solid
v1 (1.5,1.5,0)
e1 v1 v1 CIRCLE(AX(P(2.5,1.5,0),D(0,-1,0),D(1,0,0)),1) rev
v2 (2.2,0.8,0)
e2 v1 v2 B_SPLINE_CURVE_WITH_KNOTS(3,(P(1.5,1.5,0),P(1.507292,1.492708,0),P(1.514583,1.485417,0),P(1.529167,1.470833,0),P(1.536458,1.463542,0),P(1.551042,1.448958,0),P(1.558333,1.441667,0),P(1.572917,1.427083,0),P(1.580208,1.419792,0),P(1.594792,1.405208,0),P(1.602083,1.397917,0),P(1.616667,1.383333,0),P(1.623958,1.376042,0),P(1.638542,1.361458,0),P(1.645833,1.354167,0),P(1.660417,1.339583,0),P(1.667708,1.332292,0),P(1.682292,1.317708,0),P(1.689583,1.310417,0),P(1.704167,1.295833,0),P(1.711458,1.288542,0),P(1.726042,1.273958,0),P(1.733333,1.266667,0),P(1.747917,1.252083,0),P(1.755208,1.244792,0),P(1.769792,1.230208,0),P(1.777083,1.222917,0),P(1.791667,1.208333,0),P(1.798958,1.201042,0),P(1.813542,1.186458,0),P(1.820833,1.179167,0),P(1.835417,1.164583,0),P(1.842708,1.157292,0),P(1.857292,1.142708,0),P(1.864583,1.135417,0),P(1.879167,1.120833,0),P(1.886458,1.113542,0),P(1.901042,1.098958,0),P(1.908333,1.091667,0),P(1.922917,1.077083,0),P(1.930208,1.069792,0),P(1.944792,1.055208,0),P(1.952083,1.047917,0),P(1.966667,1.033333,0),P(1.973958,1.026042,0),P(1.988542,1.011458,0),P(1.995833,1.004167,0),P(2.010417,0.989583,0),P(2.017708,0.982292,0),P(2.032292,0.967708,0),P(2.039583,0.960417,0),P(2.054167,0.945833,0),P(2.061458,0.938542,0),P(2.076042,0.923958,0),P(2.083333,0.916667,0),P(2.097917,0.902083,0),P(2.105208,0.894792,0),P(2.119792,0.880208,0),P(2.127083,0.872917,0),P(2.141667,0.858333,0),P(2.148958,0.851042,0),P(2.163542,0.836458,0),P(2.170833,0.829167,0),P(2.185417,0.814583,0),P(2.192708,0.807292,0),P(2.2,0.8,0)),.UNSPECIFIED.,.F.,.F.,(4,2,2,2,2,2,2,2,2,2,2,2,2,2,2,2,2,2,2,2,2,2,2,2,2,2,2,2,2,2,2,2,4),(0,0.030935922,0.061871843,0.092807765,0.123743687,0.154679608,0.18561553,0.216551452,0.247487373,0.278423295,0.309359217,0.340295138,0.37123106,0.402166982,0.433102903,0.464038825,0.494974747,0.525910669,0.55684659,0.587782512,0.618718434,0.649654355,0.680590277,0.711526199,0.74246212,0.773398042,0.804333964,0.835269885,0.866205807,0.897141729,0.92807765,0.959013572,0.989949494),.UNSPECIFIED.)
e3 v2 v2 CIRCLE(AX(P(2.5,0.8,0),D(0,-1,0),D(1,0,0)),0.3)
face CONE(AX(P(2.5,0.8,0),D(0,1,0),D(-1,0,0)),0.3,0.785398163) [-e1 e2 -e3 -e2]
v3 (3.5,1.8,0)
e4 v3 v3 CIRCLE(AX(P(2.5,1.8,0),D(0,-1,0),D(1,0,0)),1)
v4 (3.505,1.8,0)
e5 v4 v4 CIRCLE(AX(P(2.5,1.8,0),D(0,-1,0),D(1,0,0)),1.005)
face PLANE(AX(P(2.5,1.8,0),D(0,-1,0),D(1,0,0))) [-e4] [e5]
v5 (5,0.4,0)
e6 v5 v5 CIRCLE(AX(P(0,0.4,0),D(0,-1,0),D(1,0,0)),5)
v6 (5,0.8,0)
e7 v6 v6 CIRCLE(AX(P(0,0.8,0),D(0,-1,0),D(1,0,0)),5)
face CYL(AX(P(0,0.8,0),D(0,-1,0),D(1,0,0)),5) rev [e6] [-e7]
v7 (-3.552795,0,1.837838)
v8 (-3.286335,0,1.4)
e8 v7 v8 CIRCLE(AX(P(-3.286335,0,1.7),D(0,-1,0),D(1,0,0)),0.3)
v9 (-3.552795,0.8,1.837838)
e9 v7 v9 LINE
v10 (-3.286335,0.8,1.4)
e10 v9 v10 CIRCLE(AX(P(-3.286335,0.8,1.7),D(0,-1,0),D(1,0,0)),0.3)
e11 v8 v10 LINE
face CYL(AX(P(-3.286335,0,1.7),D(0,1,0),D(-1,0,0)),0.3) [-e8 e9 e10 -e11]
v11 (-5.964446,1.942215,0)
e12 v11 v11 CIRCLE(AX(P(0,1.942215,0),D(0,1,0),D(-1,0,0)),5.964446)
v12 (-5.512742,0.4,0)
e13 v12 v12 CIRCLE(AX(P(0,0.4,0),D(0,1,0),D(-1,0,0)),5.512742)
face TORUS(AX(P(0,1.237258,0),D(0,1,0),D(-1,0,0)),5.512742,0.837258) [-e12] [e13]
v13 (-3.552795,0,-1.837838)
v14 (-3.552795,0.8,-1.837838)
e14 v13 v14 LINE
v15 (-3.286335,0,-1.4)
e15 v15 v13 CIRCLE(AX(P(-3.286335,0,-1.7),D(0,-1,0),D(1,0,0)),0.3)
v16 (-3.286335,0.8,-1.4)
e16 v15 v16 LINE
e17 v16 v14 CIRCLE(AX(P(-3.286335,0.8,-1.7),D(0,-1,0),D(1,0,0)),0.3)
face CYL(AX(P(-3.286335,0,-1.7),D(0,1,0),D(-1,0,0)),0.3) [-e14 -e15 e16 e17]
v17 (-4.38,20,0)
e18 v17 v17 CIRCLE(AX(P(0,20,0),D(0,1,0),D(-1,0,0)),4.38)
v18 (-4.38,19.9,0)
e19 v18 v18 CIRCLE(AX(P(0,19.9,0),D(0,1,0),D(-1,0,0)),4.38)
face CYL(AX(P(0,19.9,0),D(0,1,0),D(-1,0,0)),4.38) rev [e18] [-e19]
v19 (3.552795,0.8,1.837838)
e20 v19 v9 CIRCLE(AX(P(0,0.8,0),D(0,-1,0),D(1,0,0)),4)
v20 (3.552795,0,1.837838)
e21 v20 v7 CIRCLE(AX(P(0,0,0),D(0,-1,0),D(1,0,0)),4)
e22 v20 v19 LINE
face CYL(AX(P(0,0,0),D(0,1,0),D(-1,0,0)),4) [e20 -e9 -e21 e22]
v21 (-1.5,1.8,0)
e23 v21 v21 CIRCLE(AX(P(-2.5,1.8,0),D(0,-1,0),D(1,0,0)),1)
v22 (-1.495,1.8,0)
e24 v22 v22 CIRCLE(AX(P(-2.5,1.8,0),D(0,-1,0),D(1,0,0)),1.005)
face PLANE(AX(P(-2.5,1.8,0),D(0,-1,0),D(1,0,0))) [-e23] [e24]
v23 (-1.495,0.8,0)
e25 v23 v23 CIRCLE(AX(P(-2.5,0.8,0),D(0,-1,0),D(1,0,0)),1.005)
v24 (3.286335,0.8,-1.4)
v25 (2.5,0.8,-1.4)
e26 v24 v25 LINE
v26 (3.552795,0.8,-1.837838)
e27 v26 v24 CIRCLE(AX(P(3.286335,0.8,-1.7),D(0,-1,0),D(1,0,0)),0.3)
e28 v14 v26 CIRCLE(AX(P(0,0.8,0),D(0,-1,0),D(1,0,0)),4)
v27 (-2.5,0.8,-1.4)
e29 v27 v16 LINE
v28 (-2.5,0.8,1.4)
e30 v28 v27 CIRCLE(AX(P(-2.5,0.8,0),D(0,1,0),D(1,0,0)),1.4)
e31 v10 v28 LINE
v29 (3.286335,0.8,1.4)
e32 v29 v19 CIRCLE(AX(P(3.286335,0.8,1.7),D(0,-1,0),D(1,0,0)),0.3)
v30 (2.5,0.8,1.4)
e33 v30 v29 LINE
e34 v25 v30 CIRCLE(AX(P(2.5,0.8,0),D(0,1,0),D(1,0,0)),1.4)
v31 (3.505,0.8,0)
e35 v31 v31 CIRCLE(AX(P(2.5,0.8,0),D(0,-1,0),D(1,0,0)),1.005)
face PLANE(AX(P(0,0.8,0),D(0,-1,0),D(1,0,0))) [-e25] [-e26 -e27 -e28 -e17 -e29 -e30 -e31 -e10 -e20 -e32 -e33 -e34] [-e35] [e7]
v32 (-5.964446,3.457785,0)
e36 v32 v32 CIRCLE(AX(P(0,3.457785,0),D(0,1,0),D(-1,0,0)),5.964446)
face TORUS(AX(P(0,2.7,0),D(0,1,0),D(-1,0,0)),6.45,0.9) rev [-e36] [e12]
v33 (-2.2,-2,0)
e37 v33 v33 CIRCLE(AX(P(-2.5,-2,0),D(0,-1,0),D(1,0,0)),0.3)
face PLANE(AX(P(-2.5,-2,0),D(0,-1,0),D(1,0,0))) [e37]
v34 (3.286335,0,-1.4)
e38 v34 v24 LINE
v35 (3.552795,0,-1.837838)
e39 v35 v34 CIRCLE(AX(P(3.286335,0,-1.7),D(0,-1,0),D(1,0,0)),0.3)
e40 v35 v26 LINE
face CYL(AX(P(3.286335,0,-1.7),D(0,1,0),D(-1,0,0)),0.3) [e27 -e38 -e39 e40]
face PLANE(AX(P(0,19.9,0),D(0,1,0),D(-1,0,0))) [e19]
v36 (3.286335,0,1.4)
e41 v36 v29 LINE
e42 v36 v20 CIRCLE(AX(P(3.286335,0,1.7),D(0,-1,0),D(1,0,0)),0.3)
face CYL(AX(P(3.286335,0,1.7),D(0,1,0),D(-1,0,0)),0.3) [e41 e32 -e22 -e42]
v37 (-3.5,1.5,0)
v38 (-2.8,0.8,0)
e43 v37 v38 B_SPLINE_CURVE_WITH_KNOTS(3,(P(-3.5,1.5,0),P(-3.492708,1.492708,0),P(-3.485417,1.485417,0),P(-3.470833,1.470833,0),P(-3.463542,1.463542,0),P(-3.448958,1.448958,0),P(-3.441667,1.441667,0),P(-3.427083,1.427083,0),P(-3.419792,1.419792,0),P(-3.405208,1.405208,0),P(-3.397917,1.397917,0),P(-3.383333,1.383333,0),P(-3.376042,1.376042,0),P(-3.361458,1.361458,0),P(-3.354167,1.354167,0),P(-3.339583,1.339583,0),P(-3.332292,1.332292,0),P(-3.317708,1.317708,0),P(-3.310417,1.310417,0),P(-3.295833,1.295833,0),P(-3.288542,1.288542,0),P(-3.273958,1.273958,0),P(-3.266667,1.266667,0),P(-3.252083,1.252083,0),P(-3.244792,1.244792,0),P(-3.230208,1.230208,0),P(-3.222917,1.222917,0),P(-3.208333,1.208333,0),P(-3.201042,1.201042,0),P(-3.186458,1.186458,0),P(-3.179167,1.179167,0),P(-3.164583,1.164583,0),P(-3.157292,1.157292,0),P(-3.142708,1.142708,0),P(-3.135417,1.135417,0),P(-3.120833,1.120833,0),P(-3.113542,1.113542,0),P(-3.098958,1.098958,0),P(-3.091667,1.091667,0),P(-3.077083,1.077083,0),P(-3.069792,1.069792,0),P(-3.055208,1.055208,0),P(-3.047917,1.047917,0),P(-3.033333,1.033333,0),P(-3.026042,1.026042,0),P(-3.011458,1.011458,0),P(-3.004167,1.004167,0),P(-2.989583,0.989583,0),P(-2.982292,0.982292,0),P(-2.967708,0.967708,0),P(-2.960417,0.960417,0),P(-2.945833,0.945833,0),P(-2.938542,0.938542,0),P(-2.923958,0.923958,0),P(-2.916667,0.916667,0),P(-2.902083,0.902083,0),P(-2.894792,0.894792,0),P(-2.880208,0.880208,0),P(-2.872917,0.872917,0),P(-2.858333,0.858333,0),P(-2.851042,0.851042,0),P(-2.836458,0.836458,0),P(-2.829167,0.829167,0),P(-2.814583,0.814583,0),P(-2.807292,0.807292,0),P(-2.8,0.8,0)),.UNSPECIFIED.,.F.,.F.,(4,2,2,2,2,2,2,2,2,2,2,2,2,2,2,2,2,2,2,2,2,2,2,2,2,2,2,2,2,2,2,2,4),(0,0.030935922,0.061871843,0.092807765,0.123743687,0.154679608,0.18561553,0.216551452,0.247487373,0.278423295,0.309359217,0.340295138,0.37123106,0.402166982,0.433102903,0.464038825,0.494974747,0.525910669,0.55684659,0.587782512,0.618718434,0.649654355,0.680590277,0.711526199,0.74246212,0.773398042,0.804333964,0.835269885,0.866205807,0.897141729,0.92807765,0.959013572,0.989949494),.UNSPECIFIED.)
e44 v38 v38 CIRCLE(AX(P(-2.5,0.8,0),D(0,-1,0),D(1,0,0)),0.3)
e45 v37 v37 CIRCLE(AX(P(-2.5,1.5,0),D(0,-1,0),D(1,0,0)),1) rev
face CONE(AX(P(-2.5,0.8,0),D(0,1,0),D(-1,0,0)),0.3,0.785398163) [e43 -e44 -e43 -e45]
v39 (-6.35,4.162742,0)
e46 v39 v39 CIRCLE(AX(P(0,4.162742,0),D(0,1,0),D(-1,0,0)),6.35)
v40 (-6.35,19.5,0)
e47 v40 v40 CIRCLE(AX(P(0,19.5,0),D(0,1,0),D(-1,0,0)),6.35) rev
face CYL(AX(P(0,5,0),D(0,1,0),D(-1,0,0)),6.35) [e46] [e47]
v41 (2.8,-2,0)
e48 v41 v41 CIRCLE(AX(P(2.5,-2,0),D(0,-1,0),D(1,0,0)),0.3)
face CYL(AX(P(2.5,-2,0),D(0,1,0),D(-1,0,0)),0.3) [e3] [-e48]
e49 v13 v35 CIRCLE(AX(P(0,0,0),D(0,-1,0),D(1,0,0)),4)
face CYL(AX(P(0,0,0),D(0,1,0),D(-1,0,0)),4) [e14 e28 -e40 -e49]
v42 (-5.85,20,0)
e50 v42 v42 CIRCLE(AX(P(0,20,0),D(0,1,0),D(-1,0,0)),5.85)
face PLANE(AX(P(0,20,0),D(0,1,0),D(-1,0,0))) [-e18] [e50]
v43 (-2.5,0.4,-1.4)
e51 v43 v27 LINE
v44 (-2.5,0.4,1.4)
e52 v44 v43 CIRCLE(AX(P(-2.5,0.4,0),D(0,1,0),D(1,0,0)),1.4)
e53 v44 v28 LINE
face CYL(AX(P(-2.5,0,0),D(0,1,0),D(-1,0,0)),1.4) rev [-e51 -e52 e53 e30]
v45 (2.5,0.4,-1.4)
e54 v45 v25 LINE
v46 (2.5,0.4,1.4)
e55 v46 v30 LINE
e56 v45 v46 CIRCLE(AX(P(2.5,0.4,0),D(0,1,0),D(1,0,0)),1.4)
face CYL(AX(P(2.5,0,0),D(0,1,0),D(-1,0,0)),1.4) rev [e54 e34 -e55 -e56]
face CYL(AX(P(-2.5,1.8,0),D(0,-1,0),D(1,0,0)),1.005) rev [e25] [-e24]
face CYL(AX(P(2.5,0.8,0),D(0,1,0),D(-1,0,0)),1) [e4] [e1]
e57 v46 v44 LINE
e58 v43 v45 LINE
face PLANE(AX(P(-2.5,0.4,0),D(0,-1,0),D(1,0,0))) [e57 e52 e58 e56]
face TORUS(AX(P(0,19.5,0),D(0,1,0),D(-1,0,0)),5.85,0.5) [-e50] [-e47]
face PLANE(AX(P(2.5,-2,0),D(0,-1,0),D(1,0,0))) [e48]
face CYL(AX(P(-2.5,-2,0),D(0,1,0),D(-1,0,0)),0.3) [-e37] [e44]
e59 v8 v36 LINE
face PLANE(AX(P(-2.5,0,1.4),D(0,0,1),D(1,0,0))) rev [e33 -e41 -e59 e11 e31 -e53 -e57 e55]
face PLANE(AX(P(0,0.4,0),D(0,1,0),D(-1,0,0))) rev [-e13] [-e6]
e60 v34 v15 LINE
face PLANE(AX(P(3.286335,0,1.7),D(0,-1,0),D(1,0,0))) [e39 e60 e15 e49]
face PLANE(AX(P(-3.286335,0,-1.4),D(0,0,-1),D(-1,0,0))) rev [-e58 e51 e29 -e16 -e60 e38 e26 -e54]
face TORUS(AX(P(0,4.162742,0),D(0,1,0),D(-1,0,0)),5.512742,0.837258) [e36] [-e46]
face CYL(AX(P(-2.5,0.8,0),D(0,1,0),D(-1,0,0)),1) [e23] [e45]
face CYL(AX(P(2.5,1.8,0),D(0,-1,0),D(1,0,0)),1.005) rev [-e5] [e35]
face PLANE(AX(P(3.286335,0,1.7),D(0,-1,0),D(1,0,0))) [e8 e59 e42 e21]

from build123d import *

# Parameters (mm, degrees)
SKETCH4_R              = 5
CUT_EXTRUDE1_DEPTH     = 0.4
BOSS_EXTRUDE1_DEPTH    = 0.8
CUT_EXTRUDE2_START     = -0.4
CUT_EXTRUDE2_DEPTH     = 0.4
SKETCH8_R              = 1.005
CUT_EXTRUDE3_DEPTH     = 1
SKETCH9_R              = 1
BOSS_EXTRUDE2_DEPTH    = 1
CHAMFER1_SIZE          = 0.7
SKETCH10_R             = 0.3
BOSS_EXTRUDE3_DEPTH    = 2.8
BOSS_EXTRUDE4_START    = 15
SKETCH11_R             = 6.35
BOSS_EXTRUDE4_DEPTH    = 15
FILLET1_R              = 0.5
SKETCH12_R             = 4.38
CUT_EXTRUDE4_DEPTH     = 0.1
SPLIT1_SURFACE_1_BACK  = 29.4
SPLIT1_SURFACE_1_DEPTH = 58.8
SPLIT1_SURFACE_2_BACK  = 29.4
SPLIT1_SURFACE_2_DEPTH = 58.8


with BuildPart() as part:
    # Sketch3 → Revolve1 (revolve)
    with BuildSketch(Plane.XY, mode=Mode.PRIVATE) as revolve1_sk:
        with BuildLine():
            Line((0, 0.4), (5.5127417, 0.4))
            ThreePointArc((5.5127417, 0.4), (6.316244242, 1.001917854), (5.964446142, 1.942215432))
            ThreePointArc((5.964446142, 1.942215432), (5.55, 2.7), (5.964446142, 3.457784568))
            ThreePointArc((5.964446142, 3.457784568), (6.247314622, 3.760990429), (6.35, 4.1627417))
            Line((6.35, 4.1627417), (6.35, 5))
            Line((6.35, 5), (0, 5))
            Line((0, 5), (0, 0.4))
        make_face()
    revolve(revolve1_sk.sketch.rotate(Axis((0, 5, 0), (0, -1, 0)), 180), axis=Axis((0, 5, 0), (0, -1, 0)))

    # Sketch4 → Cut-Extrude1 (cut)
    with BuildSketch(Plane.XZ.offset(-0.4)):
        Circle(SKETCH4_R)
    extrude(amount=-CUT_EXTRUDE1_DEPTH, mode=Mode.SUBTRACT)

    # Sketch5 → Boss-Extrude1 (add)
    with BuildSketch(Plane.XZ.offset(-0.8)):
        with BuildLine():
            Line((-3.286335345, -1.4), (-2.5, -1.4))
            ThreePointArc((-2.5, -1.4), (-1.1, 0), (-2.5, 1.4))
            Line((-2.5, 1.4), (-3.286335345, 1.4))
            ThreePointArc((-3.286335345, 1.4), (-3.542608004, 1.544037427), (-3.552794968, 1.837837838))
            ThreePointArc((-3.552794968, 1.837837838), (0, 4), (3.552794968, 1.837837838))
            ThreePointArc((3.552794968, 1.837837838), (3.542608004, 1.544037427), (3.286335345, 1.4))
            Line((3.286335345, 1.4), (2.5, 1.4))
            ThreePointArc((2.5, 1.4), (1.1, 0), (2.5, -1.4))
            Line((2.5, -1.4), (3.286335345, -1.4))
            ThreePointArc((3.286335345, -1.4), (3.542608004, -1.544037427), (3.552794968, -1.837837838))
            ThreePointArc((3.552794968, -1.837837838), (0, -4), (-3.552794968, -1.837837838))
            ThreePointArc((-3.552794968, -1.837837838), (-3.542608004, -1.544037427), (-3.286335345, -1.4))
        make_face()
    extrude(amount=BOSS_EXTRUDE1_DEPTH)

    # Sketch7 → Cut-Extrude2 (cut)
    with BuildSketch(Plane.XZ.offset(CUT_EXTRUDE2_START)):
        with BuildLine():
            Line((2.5, 1.4), (-2.5, 1.4))
            ThreePointArc((-2.5, 1.4), (-1.1, 0), (-2.5, -1.4))
            Line((-2.5, -1.4), (2.5, -1.4))
            ThreePointArc((2.5, -1.4), (1.1, 0), (2.5, 1.4))
        make_face()
    extrude(amount=CUT_EXTRUDE2_DEPTH, mode=Mode.SUBTRACT)

    # Sketch8 → Cut-Extrude3 (cut)
    with BuildSketch(Plane.XZ.offset(-0.8)):
        with Locations((-2.5, 0)):
            Circle(SKETCH8_R)
        with Locations((2.5, 0)):
            Circle(SKETCH8_R)
    extrude(amount=-CUT_EXTRUDE3_DEPTH, mode=Mode.SUBTRACT)

    # Sketch9 → Boss-Extrude2 (add)
    with BuildSketch(Plane.XZ.offset(-1.8)):
        with Locations((-2.5, 0)):
            Circle(SKETCH9_R)
        with Locations((2.5, 0)):
            Circle(SKETCH9_R)
    extrude(amount=BOSS_EXTRUDE2_DEPTH)

    # Chamfer1
    chamfer1_edges = [part.edges().sort_by_distance(p)[0] for p in [
        (-3.5, 0.8, 0),
        (1.5, 0.8, 0),
    ]]
    chamfer(chamfer1_edges, length=CHAMFER1_SIZE)

    # Sketch10 → Boss-Extrude3 (add)
    with BuildSketch(Plane.XZ.offset(-0.8)):
        with Locations(Location((-2.5, 0, 0), (0, 0, 180))):
            Circle(SKETCH10_R)
        with Locations(Location((2.5, 0, 0), (0, 0, 180))):
            Circle(SKETCH10_R)
    extrude(amount=BOSS_EXTRUDE3_DEPTH)

    # Sketch11 → Boss-Extrude4 (add)
    with BuildSketch(Plane(origin=(0, 5, 0), x_dir=(1, 0, 0), z_dir=(0, 1, 0)).offset(BOSS_EXTRUDE4_START)):
        with Locations(Location((0, 0, 0), (0, 0, 180))):
            Circle(SKETCH11_R)
    extrude(amount=-BOSS_EXTRUDE4_DEPTH)

    # Fillet1
    fillet1_edges = [part.edges().sort_by_distance(p)[0] for p in [
        (6.35, 20, 0),
    ]]
    fillet(fillet1_edges, radius=FILLET1_R)

    # Sketch12 → Cut-Extrude4 (cut)
    with BuildSketch(Plane(origin=(0, 20, 0), x_dir=(1, 0, 0), z_dir=(0, 1, 0))):
        with Locations(Location((0, 0, 0), (0, 0, 180))):
            Circle(SKETCH12_R)
    extrude(amount=-CUT_EXTRUDE4_DEPTH, mode=Mode.SUBTRACT)


with BuildPart() as body_2:
    # Split1: the piece behind the surface
    add(part.part)
    # Split1 surface: a surface, the sketch's curves swept straight by 58.8 mm
    with BuildLine(Plane(origin=(10, 0, 0), x_dir=(0, 0, -1), z_dir=(1, 0, 0)).offset(-SPLIT1_SURFACE_1_BACK), mode=Mode.PRIVATE) as split1_surface_1_path:
        Line((-1.9, 0), (1.9, 0))
        Line((1.9, 0), (1.9, 20))
        Line((1.9, 20), (-1.9, 20))
        Line((-1.9, 20), (-1.9, 0))
    split1_surface_1 = Shell.extrude(split1_surface_1_path.wire(), (1 * SPLIT1_SURFACE_1_DEPTH, 0 * SPLIT1_SURFACE_1_DEPTH, 0 * SPLIT1_SURFACE_1_DEPTH))
    split(bisect_by=split1_surface_1, keep=Keep.BOTTOM)


with BuildPart() as part_1:
    add(part.part)

    # Split1: split by a surface, the side it looks to stays
    # Split1 surface: a surface, the sketch's curves swept straight by 58.8 mm
    with BuildLine(Plane(origin=(10, 0, 0), x_dir=(0, 0, -1), z_dir=(1, 0, 0)).offset(-SPLIT1_SURFACE_2_BACK), mode=Mode.PRIVATE) as split1_surface_2_path:
        Line((-1.9, 0), (1.9, 0))
        Line((1.9, 0), (1.9, 20))
        Line((1.9, 20), (-1.9, 20))
        Line((-1.9, 20), (-1.9, 0))
    split1_surface_2 = Shell.extrude(split1_surface_2_path.wire(), (1 * SPLIT1_SURFACE_2_DEPTH, 0 * SPLIT1_SURFACE_2_DEPTH, 0 * SPLIT1_SURFACE_2_DEPTH))
    split(bisect_by=split1_surface_2, keep=Keep.TOP)

    # Combine1: read off the stored shape, not the designer's step
    # Combine1: union body 2
    add(body_2.part)


solid = part_1.part
